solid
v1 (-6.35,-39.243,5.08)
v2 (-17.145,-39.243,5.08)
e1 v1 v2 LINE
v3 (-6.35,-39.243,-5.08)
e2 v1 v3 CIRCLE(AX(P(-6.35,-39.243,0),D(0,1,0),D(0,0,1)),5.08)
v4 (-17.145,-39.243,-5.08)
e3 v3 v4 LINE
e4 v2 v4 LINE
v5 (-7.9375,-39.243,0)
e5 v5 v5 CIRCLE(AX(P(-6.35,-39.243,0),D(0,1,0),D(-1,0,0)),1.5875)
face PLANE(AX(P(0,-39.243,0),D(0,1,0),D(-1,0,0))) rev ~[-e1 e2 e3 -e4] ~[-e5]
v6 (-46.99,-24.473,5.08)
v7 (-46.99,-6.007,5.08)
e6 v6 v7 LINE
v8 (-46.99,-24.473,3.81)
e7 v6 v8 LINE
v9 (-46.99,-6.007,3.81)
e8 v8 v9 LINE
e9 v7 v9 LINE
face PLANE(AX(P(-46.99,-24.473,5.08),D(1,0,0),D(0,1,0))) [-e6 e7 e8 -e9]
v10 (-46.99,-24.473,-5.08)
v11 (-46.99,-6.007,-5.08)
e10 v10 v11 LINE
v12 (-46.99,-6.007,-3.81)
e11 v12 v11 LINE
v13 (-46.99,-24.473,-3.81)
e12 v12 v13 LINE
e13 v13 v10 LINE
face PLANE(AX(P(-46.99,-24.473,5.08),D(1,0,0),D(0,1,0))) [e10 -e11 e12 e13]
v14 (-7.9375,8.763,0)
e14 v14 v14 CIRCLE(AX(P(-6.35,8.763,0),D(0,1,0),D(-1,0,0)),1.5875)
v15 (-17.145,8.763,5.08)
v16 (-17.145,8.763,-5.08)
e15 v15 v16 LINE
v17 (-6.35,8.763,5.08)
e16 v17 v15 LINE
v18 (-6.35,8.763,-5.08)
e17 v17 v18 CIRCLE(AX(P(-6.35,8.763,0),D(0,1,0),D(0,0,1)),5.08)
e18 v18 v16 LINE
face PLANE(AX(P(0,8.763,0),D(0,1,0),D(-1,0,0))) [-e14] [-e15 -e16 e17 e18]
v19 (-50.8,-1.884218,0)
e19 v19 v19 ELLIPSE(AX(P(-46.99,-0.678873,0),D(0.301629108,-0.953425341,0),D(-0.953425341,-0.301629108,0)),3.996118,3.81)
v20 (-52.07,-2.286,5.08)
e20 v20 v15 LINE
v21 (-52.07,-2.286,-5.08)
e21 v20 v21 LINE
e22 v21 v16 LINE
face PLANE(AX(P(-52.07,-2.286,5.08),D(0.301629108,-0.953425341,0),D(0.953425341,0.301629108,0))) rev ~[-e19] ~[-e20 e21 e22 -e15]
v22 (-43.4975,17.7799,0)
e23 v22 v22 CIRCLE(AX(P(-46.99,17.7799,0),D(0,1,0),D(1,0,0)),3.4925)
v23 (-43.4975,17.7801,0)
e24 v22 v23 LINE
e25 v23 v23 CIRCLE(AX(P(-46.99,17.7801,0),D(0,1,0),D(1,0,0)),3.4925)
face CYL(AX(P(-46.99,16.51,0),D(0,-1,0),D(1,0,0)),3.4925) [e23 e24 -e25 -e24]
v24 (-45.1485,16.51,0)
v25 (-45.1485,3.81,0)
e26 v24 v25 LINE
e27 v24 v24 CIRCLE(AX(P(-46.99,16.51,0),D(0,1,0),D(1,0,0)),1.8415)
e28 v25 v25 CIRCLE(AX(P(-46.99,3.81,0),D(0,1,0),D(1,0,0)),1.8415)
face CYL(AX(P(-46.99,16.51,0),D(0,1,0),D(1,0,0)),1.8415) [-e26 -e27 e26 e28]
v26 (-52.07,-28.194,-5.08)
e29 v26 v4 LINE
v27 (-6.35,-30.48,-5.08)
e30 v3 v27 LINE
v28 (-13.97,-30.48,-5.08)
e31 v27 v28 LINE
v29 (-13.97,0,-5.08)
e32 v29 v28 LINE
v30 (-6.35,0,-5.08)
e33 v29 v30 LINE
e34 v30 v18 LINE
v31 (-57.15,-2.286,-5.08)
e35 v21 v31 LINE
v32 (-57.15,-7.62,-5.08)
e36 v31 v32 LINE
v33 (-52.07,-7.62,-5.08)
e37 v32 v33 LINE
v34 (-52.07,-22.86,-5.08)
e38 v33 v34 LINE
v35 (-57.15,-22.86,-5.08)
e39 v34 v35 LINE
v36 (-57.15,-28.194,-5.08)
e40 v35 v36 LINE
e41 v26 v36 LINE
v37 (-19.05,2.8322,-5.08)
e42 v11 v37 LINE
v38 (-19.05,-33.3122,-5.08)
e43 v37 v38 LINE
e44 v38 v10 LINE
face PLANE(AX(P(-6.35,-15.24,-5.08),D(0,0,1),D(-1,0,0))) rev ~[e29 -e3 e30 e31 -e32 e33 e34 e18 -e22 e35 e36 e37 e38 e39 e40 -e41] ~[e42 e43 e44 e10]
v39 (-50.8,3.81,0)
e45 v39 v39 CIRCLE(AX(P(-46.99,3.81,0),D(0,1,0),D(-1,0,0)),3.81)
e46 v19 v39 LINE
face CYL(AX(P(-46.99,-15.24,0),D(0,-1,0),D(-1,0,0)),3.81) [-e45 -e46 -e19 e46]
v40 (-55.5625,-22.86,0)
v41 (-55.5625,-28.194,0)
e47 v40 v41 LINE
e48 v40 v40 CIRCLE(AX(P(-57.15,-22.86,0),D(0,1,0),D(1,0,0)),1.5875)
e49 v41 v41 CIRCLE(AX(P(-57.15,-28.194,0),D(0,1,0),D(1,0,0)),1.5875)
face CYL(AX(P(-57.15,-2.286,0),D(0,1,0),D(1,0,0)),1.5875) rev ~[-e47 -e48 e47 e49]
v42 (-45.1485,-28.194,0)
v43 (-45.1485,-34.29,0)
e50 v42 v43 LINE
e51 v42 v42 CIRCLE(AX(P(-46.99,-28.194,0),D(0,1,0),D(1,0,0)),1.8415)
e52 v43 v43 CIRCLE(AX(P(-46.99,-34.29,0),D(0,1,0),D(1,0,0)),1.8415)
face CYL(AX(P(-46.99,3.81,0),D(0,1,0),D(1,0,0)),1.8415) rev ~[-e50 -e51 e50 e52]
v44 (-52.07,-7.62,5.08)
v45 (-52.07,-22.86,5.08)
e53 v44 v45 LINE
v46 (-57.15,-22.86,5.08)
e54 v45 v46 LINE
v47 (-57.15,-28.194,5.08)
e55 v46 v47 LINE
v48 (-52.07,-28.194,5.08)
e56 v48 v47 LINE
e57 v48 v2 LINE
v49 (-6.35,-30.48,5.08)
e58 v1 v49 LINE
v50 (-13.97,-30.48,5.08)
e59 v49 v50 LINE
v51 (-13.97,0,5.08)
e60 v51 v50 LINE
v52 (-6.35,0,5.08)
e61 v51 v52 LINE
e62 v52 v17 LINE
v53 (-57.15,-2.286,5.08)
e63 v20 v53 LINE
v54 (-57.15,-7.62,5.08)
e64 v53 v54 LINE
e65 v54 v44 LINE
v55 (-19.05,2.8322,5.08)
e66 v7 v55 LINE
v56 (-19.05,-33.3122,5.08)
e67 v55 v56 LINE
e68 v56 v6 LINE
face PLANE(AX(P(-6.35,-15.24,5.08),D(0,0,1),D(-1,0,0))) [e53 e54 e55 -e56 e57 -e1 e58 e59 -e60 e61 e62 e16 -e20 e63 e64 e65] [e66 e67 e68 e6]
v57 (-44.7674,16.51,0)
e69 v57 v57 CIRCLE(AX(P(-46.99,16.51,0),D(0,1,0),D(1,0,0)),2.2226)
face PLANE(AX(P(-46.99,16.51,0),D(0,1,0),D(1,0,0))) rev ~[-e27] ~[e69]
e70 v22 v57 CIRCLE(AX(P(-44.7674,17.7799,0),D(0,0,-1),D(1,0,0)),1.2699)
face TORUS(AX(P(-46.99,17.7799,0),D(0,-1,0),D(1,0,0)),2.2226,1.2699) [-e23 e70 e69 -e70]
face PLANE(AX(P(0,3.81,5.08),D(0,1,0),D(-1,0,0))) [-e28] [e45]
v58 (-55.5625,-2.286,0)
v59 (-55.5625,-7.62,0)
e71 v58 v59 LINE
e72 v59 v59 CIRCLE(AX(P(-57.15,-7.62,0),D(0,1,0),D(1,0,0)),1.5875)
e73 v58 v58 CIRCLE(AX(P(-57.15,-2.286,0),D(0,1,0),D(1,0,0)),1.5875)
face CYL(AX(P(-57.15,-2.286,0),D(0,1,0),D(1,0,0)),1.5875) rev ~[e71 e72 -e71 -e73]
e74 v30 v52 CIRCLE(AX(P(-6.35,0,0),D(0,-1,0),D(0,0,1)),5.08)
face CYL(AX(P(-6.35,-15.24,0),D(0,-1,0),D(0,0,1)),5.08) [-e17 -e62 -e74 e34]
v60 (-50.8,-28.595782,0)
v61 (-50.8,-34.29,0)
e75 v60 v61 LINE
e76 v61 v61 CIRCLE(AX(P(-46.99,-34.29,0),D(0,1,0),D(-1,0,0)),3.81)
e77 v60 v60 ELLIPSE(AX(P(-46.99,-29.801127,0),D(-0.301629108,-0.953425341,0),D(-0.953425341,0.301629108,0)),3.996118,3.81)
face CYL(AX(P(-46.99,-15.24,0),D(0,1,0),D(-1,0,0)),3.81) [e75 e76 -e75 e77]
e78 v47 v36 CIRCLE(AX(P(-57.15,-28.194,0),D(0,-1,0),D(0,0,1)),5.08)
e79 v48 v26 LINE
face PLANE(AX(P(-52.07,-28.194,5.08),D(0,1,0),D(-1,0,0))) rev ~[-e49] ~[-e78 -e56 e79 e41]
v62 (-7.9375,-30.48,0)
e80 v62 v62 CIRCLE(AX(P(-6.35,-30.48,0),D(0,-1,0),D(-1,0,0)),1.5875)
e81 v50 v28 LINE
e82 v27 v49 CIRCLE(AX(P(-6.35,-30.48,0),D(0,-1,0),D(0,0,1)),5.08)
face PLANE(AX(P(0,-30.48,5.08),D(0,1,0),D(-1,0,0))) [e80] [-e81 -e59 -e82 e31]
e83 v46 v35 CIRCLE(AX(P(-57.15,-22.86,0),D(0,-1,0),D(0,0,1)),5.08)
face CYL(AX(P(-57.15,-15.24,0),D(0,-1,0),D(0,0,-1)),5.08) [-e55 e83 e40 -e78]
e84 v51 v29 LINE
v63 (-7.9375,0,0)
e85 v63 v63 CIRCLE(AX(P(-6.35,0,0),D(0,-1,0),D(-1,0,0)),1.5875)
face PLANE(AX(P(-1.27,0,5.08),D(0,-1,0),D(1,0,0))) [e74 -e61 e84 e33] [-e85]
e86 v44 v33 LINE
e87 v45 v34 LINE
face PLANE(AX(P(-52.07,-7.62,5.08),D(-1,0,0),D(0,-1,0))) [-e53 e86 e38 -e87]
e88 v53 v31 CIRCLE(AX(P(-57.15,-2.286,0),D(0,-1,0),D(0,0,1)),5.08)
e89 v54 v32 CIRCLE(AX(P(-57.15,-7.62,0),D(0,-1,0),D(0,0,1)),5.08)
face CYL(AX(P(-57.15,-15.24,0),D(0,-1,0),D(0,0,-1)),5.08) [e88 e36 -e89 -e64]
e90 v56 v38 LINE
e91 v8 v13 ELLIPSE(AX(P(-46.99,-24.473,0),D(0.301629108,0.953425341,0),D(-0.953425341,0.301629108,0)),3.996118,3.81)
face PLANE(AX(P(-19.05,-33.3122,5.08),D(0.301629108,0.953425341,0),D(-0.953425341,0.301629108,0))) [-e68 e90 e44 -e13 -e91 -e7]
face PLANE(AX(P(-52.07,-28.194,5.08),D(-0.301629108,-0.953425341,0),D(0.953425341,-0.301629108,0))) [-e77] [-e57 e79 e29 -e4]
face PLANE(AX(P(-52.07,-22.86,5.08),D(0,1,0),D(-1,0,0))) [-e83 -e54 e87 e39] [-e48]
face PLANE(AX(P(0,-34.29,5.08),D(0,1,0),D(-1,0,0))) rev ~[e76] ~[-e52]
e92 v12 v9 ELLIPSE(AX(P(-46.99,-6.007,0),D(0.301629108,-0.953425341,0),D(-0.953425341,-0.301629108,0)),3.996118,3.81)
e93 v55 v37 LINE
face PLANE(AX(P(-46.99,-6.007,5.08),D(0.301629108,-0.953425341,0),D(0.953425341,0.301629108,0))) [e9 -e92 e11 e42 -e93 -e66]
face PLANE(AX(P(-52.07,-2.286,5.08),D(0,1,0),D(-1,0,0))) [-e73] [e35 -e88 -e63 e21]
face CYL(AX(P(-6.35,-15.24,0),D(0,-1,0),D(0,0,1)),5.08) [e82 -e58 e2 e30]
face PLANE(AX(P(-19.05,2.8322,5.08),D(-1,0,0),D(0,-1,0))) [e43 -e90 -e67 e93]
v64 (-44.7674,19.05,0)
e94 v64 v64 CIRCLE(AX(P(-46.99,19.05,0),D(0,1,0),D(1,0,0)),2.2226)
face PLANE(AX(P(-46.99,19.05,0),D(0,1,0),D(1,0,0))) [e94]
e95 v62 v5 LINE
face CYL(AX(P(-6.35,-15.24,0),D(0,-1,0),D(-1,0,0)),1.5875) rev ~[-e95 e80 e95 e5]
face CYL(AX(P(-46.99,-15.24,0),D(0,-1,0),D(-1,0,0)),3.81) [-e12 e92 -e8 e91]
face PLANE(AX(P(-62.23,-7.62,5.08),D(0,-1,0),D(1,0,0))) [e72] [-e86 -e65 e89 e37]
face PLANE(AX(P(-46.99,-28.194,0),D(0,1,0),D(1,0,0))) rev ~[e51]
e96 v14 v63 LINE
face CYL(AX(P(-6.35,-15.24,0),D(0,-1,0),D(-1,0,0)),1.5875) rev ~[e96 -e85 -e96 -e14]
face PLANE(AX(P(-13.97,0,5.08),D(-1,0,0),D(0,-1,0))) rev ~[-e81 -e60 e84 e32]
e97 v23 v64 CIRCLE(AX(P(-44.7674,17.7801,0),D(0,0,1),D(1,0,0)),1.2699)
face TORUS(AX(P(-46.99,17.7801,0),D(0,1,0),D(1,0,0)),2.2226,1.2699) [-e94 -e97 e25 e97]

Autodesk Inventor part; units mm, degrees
ref_plane "YZ Plane" through (0, 0, 0) normal (1, 0, 0) x (0, 1, 0)
ref_plane "XZ Plane" through (0, 0, 0) normal (0, 1, 0) x (-1, 0, 0)
ref_plane "XY Plane" through (0, 0, 0) normal (0, 0, 1) x (1, 0, 0)
ref_plane "Work Plane1" through (0, -15.24, 5.08) normal (0, 1, 0) x (-1, 0, 0)
sketch "Sketch2" plane through (0, -15.24, 0) normal (0, 1, 0) x (-1, 0, 0)
  arc A0 (6.35, -5.08) -> (6.35, 5.08) centre (6.35, 0) ccw construction
  line L0 (6.35, 5.08) -> (0, 5.08) projected
  line L1 (0, -5.08) -> (6.35, -5.08) projected
  circle A1 centre (6.35, 0) radius 1.5875 projected
  arc A2 (6.35, 5.08) -> (6.35, -5.08) centre (6.35, 0) ccw
  line L2 (6.35, 5.08) -> (57.15, 5.08)
  line L3 (6.35, -5.08) -> (57.15, -5.08)
  arc A3 (57.15, -5.08) -> (57.15, 5.08) centre (57.15, 0) ccw
  arc A4 (6.35, -5.08) -> (6.35, 5.08) centre (6.35, 0) ccw construction
  arc A5 (57.15, 5.08) -> (57.15, -5.08) centre (57.15, 0) ccw construction
  point P0 (0, 0)
  dimension "d0" = 50.8
extrude "Extrusion1" add sketch "Sketch2" along normal mid plane 48.006
sketch "Sketch3" plane through (-57.15, 8.763, 5.08) normal (0, 0, 1) x (1, 0, 0)
  line L0 (57.15, -8.763) -> (57.15, -39.243) projected
  line L1 (50.8, -8.763) -> (57.15, -8.763) projected
  line L2 (50.8, -8.763) -> (50.8, -39.243) projected
  line L3 (57.15, -39.243) -> (50.8, -39.243) projected
  line L4 (55.88, -48.006) -> (55.88, 0) projected
  line L5 (55.88, -39.243) -> (55.88, -8.763)
  line L6 (55.88, -8.763) -> (43.18, -8.763)
  line L7 (43.18, -8.763) -> (43.18, -39.243)
  line L8 (5.08, -11.049) -> (40.005, 0)
  line L9 (50.8, 0) -> (0, 0) projected
  line L10 (0, -48.006) -> (0, 0) construction
  line L11 (0, 0) -> (0, 0) projected
  line L12 (0, -48.006) -> (0, 0) construction
  line L13 (0, -48.006) -> (0, -48.006) projected
  line L14 (40.005, 0) -> (55.88, 0) construction
  line L15 (55.88, -24.003) -> (-5.08, -24.003) construction
  line L16 (40.005, 0) -> (-5.08, 0)
  line L17 (-5.08, -11.049) -> (-5.08, 0)
  line L18 (5.08, -36.957) -> (40.005, -48.006)
  line L19 (5.08, -36.957) -> (-5.08, -36.957)
  line L20 (40.005, -48.006) -> (55.88, -48.006) construction
  line L21 (50.8, -48.006) -> (0, -48.006) projected
  line L22 (-5.08, -48.006) -> (0, -48.006) projected
  line L23 (-5.08, -48.006) -> (-5.08, 0) construction
  line L24 (40.005, -48.006) -> (-5.08, -48.006)
  line L25 (-5.08, -36.957) -> (-5.08, -48.006)
  line L26 (0, -48.006) -> (0, 0) construction
  line L27 (5.08, -11.049) -> (-5.08, -11.049)
  line L28 (5.08, -36.957) -> (5.08, -11.049) construction
  line L29 (55.88, -39.243) -> (43.18, -39.243)
  dimension "d3" = 15.875
  dimension "d5" = 25.908
  dimension "d10" = 10.16
  dimension "d17" = 12.7
extrude "Extrusion2" cut sketch "Sketch3" against normal through all
sketch "Sketch4" plane through (-57.15, -2.286, 0) normal (0, 1, 0) x (1, 0, 0)
  arc A0 (0, 5.08) -> (0, -5.08) centre (0, 0) ccw projected
  circle A1 centre (0, 0) radius 1.5875
  circle A2 centre (50.8, 0) radius 1.5875 projected
  point P0 (57.15, 0)
extrude "Extrusion3" cut sketch "Sketch4" against normal through all contours A1
sketch "Sketch6" plane through (-17.145, -39.243, 5.08) normal (0, 0, 1) x (1, 0, 0)
  line L0 (-45.085, 11.049) -> (-45.085, 36.957) projected
  line L1 (-40.005, 11.049) -> (-45.085, 11.049) projected
  line L2 (-40.005, 11.049) -> (-34.925, 11.049) projected
  line L3 (-45.085, 36.957) -> (-40.005, 36.957) projected
  line L4 (-34.925, 36.957) -> (-40.005, 36.957) projected
  line L5 (-45.085, 31.623) -> (-34.925, 31.623)
  line L6 (-34.925, 31.623) -> (-34.925, 16.383)
  line L7 (-34.925, 16.383) -> (-45.085, 16.383)
  line L8 (-45.085, 16.383) -> (-45.085, 31.623)
  line L9 (-45.085, 31.623) -> (-34.925, 16.383) construction
  line L10 (-34.925, 31.623) -> (-45.085, 16.383) construction
  line L11 (-40.005, 24.003) -> (-45.085, 24.003) construction
  point P0 (17.145, 39.243)
  dimension "d19" = 10.16
  dimension "d20" = 15.24
extrude "Extrusion5" cut sketch "Sketch6" against normal through all
sketch "Sketch5" plane through (-17.145, -39.243, 5.08) normal (0, 0, 1) x (1, 0, 0)
  line L0 (-40.005, 11.049) -> (-34.925, 11.049) projected
  line L1 (-34.925, 11.049) -> (0, 0) projected
  line L2 (10.795, 0) -> (0, 0) projected
  line L3 (10.795, 0) -> (10.795, 8.763) projected
  line L4 (10.795, 39.243) -> (10.795, 48.006) projected
  line L5 (0, 48.006) -> (10.795, 48.006) projected
  line L6 (0, 48.006) -> (-34.925, 36.957) projected
  line L7 (-34.925, 36.957) -> (-40.005, 36.957) projected
  line L8 (-40.005, 11.049) -> (-40.005, 16.383) projected
  line L9 (10.795, 8.763) -> (3.175, 8.763) projected
  line L10 (3.175, 8.763) -> (3.175, 39.243) projected
  line L11 (3.175, 39.243) -> (10.795, 39.243) projected
  line L12 (-40.005, 31.623) -> (-34.925, 31.623) projected
  line L13 (-34.925, 31.623) -> (-34.925, 16.383) projected
  line L14 (-34.925, 16.383) -> (-40.005, 16.383) projected
  line L15 (-40.005, 31.623) -> (-40.005, 36.957) projected
  line L16 (-1.905, 5.9308) -> (-29.845, 14.77)
  line L17 (-29.845, 14.77) -> (-29.845, 33.236)
  line L18 (-29.845, 33.236) -> (-1.905, 42.0752)
  line L19 (-1.905, 42.0752) -> (-1.905, 5.9308)
  dimension "d23" = 5.08
extrude "Extrusion4" cut sketch "Sketch5" against normal through all contours L16 L17 L18 L19
sketch "Sketch8" plane through (0, -15.24, 5.08) normal (0, 1, 0) x (-1, 0, 0)
  circle A0 centre (46.99, -5.08) radius 3.81
  arc A1 (57.15, -10.16) -> (57.15, 0) centre (57.15, -5.08) ccw projected
  line L0 (62.23, -5.08) -> (46.99, -5.08) construction
  point P0 (0, -5.08)
  dimension "d24" = 7.62
  dimension "d25" = 15.24
extrude "Extrusion6" add sketch "Sketch8" along normal mid plane 38.1
sketch "Sketch9" plane through (-46.99, 3.81, 0) normal (0, 1, 0) x (1, 0, 0)
  circle A0 centre (0, 0) radius 1.8415
  circle A1 centre (0, 0) radius 3.81 projected
  point P0 (46.99, 0)
  dimension "d28" = 3.683
extrude "Extrusion7" cut sketch "Sketch9" against normal through all contours A0
ref_plane "Work Plane2" through (-46.99, 16.51, 0) normal (0, 1, 0) x (1, 0, 0)
sketch "Sketch10" plane through (-46.99, 16.51, 0) normal (0, 1, 0) x (1, 0, 0)
  circle A0 centre (0, 0) radius 1.8415 projected
  circle A1 centre (0, 0) radius 1.8415
  point P0 (46.99, 0)
extrude "Extrusion8" add sketch "Sketch10" against normal up to surface (44.704 mm away)
sketch "Sketch11" plane through (-46.99, 16.51, 0) normal (0, 1, 0) x (1, 0, 0)
  circle A0 centre (0, 0) radius 3.81 projected
  circle A1 centre (0, 0) radius 3.4925
  point P0 (46.99, 0)
  dimension "d34" = 6.985
extrude "Extrusion9" add sketch "Sketch11" along normal blind 2.54 contours A1
full round fillet "Fillet1" first side at (-44.0995, 16.51, 0.4255) centre faces at (-43.5088, 18.2033, 0.281) second side at (-46.6012, 19.05, -0.8909)
properties part number "A_Arm"
